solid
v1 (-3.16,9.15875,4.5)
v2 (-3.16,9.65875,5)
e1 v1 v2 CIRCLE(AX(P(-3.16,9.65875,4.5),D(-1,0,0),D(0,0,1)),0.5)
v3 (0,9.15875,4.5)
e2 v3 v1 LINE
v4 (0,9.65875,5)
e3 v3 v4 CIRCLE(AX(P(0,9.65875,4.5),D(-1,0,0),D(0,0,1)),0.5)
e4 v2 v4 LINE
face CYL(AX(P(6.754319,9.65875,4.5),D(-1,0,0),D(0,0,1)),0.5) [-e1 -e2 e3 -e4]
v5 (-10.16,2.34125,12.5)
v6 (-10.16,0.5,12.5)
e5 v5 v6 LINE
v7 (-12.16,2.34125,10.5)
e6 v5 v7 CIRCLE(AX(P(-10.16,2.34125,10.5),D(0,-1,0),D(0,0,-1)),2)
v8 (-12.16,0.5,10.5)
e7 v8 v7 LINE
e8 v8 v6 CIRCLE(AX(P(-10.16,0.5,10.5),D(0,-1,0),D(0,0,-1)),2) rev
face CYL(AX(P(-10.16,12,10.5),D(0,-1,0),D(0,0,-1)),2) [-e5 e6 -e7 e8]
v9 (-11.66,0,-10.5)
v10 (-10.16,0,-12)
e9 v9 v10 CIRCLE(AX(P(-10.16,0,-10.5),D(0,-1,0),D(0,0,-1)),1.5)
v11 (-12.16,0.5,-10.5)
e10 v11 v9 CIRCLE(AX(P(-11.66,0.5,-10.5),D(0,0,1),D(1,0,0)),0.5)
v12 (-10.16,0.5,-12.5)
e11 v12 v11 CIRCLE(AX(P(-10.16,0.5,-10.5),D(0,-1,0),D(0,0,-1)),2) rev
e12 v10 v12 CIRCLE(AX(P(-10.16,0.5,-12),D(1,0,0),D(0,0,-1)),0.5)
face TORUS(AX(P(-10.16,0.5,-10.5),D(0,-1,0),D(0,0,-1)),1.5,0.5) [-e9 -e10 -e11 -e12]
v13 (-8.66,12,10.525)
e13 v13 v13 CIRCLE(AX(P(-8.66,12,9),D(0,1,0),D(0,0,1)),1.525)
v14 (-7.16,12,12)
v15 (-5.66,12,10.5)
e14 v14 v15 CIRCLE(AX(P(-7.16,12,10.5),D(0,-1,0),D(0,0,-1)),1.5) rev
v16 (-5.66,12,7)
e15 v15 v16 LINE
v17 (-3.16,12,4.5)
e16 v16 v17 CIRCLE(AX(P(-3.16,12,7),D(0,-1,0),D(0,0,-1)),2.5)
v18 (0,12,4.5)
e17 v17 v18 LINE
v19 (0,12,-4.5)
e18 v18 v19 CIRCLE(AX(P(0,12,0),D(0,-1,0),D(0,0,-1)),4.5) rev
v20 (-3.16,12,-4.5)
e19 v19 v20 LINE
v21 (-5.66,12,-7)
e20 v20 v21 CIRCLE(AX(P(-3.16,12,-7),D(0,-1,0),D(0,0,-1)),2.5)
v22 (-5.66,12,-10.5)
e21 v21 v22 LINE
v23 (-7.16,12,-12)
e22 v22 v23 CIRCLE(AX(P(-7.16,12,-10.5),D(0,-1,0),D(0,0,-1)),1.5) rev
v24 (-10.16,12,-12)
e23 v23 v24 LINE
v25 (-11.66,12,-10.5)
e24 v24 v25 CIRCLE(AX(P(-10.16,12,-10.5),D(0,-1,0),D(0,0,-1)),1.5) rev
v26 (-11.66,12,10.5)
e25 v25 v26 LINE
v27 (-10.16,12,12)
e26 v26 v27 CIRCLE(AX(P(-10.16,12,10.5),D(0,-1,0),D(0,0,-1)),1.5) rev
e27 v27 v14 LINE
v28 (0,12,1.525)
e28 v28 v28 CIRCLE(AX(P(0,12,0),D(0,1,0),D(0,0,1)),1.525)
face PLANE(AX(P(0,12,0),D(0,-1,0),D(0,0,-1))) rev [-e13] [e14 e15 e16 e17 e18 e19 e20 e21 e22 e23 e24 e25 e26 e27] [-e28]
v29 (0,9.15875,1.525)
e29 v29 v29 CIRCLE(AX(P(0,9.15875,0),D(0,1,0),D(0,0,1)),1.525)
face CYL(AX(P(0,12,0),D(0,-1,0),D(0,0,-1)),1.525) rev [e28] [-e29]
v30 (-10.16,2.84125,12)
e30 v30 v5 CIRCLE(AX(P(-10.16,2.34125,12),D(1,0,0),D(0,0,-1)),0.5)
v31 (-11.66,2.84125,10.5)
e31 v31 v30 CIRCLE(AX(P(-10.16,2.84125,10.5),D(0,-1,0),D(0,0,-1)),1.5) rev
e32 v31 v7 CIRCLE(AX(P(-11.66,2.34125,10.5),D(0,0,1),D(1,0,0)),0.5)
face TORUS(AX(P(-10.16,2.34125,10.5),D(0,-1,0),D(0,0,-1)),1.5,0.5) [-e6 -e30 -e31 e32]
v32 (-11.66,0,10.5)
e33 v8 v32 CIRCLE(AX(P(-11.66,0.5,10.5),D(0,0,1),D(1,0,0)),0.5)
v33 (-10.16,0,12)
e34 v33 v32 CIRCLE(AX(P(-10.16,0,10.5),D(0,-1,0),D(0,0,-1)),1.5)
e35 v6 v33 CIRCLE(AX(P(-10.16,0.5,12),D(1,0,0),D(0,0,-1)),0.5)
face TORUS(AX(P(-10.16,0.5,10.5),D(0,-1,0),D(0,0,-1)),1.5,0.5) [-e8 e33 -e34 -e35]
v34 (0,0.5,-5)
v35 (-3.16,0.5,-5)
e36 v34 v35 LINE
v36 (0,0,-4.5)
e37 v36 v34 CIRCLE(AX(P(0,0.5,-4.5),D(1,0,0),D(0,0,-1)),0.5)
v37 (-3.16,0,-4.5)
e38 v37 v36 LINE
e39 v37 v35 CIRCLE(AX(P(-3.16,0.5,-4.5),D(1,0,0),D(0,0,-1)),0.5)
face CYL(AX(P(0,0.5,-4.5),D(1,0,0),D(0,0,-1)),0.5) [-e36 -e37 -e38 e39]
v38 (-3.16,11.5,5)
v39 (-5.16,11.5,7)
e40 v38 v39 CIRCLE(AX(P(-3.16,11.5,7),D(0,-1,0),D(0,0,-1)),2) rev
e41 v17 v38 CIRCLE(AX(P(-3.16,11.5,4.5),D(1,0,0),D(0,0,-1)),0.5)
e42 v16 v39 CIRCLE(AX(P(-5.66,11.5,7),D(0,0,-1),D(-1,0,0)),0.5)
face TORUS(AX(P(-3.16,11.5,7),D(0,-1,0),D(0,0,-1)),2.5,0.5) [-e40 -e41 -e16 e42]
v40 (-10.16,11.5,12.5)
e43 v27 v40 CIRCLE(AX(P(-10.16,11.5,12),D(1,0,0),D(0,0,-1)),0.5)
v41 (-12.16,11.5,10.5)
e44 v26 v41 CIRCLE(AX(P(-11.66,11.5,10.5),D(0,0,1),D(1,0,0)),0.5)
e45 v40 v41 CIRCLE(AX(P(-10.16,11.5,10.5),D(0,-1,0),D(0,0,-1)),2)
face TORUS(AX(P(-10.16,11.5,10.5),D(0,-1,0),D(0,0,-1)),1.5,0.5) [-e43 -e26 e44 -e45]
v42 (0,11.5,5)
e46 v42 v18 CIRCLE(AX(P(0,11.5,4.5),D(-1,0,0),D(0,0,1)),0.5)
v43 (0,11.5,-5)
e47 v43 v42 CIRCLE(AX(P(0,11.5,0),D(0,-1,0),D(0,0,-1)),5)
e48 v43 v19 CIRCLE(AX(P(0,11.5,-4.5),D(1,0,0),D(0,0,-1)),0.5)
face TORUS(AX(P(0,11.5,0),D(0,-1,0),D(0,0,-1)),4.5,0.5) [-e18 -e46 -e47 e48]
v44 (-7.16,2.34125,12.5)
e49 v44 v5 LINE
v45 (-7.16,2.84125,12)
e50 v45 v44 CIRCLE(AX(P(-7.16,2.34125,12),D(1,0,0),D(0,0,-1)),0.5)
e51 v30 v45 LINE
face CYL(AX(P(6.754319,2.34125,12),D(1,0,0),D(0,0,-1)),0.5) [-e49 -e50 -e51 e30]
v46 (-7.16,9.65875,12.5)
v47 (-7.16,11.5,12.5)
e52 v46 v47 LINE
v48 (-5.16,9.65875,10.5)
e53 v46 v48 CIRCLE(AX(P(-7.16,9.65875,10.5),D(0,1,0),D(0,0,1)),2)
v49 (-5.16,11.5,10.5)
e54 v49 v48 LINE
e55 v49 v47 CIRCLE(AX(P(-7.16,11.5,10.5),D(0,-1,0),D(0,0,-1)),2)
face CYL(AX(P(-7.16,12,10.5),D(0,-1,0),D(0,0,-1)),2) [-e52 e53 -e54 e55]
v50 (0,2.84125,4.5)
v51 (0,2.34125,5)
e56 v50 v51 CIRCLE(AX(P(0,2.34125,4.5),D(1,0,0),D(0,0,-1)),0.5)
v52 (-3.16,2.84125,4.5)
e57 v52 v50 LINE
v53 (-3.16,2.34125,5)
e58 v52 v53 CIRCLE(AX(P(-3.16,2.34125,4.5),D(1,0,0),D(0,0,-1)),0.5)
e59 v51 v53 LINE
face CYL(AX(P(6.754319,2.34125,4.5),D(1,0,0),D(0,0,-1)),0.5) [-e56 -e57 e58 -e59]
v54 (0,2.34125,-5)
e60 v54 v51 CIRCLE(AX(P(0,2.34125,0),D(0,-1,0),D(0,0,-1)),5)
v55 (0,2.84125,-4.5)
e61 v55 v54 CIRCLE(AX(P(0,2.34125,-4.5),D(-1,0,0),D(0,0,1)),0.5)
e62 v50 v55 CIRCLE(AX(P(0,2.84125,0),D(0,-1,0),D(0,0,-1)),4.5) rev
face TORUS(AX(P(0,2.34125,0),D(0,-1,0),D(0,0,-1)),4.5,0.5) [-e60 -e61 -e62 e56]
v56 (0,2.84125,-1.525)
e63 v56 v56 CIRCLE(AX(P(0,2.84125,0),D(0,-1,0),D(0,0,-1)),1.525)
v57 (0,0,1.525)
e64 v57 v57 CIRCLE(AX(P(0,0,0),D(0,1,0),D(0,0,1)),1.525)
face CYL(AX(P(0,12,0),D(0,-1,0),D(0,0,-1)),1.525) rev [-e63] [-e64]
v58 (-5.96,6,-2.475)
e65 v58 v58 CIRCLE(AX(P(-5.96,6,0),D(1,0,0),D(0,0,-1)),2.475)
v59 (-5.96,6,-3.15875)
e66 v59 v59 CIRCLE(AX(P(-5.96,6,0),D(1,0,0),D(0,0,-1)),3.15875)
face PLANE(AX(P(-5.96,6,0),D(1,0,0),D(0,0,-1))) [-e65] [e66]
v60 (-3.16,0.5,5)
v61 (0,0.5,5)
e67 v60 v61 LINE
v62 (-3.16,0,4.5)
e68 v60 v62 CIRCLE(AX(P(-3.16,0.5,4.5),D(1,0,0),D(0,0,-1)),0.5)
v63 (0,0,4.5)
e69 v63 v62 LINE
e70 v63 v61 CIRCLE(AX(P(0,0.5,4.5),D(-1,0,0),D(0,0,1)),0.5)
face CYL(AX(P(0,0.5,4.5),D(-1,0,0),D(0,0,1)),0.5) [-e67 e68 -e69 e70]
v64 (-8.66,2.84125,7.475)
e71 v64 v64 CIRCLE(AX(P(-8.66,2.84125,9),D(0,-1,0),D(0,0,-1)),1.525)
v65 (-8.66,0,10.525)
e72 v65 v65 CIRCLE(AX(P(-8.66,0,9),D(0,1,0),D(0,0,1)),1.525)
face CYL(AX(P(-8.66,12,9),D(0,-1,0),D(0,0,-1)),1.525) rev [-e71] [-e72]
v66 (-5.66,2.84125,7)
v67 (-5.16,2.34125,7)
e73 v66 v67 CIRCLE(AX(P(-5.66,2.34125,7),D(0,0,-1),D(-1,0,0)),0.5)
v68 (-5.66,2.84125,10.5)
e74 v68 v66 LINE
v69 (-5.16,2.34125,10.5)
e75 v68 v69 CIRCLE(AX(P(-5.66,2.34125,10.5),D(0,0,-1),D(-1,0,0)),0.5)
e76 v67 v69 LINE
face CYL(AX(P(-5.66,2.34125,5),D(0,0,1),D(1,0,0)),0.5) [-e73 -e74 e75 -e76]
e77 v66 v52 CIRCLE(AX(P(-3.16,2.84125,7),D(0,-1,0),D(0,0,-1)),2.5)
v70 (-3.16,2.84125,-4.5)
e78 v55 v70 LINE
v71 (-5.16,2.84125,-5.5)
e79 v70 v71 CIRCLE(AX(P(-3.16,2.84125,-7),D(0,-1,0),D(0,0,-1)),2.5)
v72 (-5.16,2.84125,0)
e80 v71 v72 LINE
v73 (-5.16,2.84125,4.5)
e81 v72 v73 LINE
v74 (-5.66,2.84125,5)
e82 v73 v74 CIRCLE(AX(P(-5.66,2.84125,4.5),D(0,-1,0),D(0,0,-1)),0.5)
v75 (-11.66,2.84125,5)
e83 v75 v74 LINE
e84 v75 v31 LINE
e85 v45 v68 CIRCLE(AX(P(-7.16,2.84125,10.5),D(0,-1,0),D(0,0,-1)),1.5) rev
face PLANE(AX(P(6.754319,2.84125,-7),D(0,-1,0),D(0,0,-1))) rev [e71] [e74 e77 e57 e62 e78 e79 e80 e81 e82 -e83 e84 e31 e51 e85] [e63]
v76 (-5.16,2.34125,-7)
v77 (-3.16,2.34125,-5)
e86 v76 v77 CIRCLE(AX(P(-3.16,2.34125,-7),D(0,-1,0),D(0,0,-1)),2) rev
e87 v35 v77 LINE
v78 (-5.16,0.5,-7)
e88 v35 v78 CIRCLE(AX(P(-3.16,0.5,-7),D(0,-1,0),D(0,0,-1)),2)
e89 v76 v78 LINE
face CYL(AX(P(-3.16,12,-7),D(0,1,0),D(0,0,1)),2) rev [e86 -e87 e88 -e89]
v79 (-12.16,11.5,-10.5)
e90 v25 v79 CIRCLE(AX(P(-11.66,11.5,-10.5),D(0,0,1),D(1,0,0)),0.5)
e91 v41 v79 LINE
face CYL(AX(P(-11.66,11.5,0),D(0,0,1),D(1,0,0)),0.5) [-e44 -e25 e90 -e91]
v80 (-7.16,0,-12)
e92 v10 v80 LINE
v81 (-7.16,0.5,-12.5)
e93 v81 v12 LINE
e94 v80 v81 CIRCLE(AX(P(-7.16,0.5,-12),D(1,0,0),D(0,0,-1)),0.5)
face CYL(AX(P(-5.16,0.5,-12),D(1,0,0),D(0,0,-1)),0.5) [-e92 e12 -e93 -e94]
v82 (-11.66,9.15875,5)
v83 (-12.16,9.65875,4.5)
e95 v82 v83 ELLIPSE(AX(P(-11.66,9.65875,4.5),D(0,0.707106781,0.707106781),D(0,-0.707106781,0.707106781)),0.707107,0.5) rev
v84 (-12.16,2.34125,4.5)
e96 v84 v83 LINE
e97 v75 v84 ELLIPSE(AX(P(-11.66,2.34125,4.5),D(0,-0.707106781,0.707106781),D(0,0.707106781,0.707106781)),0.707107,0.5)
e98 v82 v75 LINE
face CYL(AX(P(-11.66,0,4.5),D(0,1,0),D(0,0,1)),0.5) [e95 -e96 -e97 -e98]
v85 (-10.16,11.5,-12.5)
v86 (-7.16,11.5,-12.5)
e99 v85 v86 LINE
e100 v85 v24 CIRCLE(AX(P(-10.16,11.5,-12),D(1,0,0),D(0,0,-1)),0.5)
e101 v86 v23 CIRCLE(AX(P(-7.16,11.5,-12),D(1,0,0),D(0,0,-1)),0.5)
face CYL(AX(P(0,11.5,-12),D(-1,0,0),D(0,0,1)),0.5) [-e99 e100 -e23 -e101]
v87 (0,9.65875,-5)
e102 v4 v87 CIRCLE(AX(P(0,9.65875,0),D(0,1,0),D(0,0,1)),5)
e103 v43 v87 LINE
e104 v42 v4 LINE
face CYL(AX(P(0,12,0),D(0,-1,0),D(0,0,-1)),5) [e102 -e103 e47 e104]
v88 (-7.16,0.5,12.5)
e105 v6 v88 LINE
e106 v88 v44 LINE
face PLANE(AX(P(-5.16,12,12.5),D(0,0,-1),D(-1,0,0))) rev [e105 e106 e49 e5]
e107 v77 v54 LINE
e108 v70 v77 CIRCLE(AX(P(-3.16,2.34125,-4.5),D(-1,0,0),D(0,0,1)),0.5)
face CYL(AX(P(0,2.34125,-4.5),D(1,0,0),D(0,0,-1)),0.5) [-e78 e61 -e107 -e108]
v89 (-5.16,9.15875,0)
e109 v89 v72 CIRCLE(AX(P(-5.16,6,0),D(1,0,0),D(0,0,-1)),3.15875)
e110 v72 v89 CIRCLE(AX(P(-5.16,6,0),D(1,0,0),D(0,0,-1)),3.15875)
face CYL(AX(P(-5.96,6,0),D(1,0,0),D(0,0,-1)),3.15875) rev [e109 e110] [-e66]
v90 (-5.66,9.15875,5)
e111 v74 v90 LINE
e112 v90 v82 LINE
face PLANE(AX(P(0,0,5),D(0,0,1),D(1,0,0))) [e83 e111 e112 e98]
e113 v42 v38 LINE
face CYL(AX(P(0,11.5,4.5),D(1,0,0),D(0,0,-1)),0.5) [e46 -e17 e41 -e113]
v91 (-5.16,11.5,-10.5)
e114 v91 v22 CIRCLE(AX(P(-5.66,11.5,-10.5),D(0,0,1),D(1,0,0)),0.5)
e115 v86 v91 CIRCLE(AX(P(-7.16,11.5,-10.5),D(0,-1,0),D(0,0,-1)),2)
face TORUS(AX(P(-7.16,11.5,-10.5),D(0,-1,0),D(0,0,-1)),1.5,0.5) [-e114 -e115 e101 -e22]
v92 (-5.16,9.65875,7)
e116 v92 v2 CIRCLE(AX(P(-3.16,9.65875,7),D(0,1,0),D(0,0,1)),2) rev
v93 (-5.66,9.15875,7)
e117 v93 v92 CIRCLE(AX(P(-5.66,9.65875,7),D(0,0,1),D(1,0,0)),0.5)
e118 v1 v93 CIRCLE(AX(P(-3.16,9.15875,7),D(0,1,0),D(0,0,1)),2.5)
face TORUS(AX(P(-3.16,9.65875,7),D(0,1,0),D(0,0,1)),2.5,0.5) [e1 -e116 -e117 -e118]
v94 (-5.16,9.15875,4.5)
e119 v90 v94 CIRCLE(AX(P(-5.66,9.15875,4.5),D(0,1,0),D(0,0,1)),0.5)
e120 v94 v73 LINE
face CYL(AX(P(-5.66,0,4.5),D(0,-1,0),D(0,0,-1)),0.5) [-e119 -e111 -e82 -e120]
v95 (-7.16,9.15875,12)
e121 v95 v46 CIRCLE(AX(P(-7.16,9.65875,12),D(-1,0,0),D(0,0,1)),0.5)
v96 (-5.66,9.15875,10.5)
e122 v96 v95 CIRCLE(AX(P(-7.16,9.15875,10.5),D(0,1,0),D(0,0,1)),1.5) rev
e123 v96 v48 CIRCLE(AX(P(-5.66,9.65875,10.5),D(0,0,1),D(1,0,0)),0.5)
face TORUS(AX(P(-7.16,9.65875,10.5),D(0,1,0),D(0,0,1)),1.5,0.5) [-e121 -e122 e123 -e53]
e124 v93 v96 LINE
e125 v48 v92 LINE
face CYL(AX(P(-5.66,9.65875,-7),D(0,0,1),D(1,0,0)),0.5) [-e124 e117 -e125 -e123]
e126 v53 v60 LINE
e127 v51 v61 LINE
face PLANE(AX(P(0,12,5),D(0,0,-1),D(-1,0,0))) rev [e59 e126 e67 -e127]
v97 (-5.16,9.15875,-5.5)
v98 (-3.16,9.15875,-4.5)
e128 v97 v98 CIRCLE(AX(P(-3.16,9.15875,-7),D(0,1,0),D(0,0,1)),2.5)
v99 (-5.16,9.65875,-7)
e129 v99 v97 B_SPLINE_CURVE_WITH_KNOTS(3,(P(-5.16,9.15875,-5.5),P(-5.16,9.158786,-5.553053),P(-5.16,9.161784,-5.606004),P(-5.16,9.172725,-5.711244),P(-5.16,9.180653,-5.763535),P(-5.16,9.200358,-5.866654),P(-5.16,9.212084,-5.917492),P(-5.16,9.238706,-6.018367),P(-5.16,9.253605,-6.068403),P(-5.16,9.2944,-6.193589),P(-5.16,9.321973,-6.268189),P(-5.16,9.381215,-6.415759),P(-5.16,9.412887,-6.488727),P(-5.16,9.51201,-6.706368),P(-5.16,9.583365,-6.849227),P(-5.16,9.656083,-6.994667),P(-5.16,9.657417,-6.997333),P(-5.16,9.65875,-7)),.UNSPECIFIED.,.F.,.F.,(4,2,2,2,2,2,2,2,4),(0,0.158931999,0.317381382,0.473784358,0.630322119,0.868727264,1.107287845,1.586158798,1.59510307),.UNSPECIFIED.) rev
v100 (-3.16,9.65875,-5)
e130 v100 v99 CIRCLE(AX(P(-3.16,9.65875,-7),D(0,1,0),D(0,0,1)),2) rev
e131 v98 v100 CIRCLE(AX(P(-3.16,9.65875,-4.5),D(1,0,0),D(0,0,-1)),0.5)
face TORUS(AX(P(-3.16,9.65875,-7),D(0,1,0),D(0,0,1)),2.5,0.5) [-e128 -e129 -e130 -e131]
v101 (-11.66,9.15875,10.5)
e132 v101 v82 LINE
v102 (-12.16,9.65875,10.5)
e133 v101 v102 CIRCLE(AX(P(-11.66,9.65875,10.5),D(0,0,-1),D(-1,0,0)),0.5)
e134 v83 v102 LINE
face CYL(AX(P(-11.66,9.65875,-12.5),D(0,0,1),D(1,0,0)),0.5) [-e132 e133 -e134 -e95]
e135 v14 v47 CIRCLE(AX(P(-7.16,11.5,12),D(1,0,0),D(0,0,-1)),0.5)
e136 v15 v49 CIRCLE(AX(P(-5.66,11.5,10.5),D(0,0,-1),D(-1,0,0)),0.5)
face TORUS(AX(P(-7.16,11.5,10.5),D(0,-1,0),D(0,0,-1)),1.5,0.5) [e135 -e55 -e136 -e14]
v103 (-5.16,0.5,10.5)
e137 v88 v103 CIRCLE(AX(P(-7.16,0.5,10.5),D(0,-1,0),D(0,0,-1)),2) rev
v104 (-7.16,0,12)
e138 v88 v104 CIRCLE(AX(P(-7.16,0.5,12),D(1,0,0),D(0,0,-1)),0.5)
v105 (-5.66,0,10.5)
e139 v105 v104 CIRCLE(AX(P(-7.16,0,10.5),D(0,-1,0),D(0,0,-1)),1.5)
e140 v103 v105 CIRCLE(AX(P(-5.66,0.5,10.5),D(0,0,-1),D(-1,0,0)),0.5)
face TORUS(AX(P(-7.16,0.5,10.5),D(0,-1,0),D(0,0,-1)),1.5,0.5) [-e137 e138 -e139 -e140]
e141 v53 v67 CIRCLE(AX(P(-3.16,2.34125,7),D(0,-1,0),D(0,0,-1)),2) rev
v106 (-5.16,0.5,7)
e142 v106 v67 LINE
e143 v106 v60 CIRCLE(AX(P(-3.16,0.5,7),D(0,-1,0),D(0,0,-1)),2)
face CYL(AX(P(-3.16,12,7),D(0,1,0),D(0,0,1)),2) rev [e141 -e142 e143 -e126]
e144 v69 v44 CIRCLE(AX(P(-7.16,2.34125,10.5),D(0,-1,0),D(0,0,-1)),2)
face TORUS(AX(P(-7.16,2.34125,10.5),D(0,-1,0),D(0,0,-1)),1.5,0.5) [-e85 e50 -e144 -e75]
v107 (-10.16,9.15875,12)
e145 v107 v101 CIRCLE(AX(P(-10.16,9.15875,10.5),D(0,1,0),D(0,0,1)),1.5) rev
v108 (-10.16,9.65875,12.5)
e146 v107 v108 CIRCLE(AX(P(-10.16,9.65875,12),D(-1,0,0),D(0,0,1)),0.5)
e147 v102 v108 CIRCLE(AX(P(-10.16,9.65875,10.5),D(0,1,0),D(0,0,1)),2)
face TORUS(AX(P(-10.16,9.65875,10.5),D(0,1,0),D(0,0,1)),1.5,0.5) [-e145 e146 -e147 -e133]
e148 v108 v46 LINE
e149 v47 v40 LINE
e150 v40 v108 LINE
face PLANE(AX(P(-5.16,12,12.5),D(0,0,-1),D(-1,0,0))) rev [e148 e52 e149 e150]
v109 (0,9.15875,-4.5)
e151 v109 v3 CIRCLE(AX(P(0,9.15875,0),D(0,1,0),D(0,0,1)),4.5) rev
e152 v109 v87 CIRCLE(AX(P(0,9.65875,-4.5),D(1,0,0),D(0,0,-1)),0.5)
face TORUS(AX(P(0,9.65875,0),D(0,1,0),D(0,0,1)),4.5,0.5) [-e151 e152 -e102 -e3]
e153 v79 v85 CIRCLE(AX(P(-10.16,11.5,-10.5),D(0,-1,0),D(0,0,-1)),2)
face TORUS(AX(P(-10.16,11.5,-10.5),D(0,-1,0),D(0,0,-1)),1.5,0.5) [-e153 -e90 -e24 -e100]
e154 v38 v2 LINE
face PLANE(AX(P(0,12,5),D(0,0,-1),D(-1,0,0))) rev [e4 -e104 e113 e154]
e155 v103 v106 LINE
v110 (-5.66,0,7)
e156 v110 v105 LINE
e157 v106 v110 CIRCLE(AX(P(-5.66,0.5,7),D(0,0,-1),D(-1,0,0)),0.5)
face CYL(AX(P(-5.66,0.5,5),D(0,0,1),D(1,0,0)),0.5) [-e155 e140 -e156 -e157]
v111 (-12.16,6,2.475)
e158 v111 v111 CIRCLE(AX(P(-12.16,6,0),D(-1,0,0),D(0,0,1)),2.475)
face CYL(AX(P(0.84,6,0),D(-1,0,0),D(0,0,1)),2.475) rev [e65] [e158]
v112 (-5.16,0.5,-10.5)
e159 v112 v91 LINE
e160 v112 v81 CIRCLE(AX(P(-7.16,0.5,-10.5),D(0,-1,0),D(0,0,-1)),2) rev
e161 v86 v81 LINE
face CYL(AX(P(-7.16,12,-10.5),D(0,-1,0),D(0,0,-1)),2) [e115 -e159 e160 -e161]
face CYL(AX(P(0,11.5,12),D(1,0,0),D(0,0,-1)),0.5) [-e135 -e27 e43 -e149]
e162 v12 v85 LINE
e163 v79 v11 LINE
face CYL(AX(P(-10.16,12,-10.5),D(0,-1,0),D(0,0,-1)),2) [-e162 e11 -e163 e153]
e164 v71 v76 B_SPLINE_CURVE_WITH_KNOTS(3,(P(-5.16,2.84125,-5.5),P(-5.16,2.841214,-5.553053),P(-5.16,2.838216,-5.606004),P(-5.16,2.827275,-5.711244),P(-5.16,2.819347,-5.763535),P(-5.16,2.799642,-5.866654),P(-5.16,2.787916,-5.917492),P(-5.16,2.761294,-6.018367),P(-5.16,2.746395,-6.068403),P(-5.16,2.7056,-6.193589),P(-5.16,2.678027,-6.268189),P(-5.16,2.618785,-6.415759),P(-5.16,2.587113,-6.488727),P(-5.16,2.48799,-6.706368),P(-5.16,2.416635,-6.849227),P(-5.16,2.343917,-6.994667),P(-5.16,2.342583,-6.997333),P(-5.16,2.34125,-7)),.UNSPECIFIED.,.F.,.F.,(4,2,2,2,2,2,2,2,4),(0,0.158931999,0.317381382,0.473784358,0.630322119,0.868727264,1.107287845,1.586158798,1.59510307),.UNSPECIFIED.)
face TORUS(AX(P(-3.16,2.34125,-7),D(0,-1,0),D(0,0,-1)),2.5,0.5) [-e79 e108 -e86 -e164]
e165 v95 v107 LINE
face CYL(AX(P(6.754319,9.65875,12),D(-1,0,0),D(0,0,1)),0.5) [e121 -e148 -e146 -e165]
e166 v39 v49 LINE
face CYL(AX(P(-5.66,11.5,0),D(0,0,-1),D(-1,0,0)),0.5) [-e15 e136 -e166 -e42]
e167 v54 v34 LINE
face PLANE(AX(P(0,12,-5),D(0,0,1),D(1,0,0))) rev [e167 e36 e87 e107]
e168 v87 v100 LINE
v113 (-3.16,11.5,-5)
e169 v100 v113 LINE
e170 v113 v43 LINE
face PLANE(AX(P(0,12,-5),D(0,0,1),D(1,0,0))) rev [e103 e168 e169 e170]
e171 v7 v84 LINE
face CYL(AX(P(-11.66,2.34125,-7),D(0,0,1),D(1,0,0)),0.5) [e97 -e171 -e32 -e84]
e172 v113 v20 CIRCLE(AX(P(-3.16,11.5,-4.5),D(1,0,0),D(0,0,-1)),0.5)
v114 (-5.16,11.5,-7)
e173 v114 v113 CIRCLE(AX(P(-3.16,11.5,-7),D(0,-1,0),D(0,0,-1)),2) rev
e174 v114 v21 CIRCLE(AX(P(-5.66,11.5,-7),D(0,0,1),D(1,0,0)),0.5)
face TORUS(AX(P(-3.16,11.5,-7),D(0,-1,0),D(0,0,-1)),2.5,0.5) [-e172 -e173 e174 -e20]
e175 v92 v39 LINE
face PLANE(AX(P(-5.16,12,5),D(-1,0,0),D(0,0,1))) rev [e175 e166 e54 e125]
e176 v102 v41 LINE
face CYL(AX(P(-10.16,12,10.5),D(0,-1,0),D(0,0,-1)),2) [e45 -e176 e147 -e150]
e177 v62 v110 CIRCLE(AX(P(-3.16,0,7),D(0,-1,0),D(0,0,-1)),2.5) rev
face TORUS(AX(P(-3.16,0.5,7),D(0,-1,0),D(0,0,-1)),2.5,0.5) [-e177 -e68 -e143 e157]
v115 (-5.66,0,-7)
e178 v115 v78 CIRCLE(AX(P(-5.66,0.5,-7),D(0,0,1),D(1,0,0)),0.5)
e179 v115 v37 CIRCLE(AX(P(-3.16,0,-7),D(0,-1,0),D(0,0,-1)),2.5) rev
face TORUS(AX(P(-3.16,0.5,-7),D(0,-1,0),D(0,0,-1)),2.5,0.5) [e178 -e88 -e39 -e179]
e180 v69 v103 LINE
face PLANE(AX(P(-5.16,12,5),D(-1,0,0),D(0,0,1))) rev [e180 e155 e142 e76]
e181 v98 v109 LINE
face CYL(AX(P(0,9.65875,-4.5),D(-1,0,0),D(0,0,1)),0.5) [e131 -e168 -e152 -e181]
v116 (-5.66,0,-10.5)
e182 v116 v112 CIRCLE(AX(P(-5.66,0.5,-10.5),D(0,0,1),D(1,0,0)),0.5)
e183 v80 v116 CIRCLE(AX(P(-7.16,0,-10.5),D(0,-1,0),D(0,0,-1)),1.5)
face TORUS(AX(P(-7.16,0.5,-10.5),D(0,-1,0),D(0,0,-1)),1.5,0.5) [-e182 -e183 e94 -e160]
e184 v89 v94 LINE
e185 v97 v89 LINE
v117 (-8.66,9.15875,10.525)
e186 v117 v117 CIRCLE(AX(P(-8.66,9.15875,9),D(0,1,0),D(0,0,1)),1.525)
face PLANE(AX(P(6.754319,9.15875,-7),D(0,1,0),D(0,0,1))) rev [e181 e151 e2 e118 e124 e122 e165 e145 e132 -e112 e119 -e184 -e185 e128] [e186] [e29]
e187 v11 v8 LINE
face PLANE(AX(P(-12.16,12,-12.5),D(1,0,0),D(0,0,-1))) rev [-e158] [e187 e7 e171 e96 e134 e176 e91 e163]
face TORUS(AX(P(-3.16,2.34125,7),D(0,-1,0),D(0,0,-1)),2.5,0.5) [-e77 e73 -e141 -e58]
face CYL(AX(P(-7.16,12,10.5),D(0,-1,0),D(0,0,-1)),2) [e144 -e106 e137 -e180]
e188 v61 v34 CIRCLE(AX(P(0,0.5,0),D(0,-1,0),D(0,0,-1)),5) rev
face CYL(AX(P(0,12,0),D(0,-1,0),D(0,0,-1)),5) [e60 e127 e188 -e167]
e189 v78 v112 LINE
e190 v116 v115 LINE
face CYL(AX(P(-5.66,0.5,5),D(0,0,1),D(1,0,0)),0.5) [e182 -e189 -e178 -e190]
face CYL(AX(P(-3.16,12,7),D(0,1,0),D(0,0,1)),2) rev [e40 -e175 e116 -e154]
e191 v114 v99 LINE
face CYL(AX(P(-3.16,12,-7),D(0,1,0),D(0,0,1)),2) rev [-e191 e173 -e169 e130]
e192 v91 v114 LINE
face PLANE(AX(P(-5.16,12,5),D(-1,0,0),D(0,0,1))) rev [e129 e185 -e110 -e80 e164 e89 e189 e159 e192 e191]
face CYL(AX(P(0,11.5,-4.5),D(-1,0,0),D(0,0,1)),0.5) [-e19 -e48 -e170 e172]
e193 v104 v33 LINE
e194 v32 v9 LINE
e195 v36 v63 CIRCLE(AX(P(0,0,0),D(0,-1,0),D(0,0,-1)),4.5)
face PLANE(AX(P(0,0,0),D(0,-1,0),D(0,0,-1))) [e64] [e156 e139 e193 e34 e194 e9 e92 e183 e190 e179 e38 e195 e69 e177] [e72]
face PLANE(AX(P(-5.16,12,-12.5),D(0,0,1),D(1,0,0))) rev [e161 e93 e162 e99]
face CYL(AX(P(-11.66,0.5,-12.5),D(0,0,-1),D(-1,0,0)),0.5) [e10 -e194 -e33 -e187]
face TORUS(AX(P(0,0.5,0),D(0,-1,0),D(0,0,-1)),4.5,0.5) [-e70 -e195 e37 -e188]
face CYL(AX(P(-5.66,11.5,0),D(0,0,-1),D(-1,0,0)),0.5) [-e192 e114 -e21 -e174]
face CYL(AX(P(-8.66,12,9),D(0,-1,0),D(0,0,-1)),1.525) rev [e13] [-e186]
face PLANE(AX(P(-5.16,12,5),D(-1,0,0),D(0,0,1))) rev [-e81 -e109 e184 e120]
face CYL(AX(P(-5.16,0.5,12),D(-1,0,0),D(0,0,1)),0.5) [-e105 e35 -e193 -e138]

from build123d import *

# Parameters (mm, degrees)
SKETCH2_R           = 1.525
BOSS_EXTRUDE1_DEPTH = 12
SKETCH3_W           = 11.91431853
SKETCH3_H           = 6.3175
CUT_EXTRUDE1_DEPTH  = 12
FILLET2_R           = 2
SKETCH5_R           = 2.475
CUT_EXTRUDE3_DEPTH  = 13
SKETCH6_W           = 7
SKETCH6_H           = 6.3175
CUT_EXTRUDE4_DEPTH  = 7.5
FILLET3_R           = 2
CUT_EXTRUDE5_START  = -0.8
SKETCH8_R           = 3.15875
SKETCH8_R_2         = 2.475
CUT_EXTRUDE5_DEPTH  = 0.8
FILLET8_R           = 0.5


with BuildPart() as part:
    # Sketch2 → Boss-Extrude1 (new body)
    with BuildSketch(Plane(origin=(0, 0, 0), x_dir=(1, 0, 0), z_dir=(0, 1, 0))):
        with BuildLine():
            Line((-5.16, -5), (-5.16, -12.5))
            Line((-5.16, -12.5), (-12.16, -12.5))
            Line((-12.16, -12.5), (-12.16, 12.5))
            Line((-12.16, 12.5), (-5.16, 12.5))
            Line((-5.16, 12.5), (-5.16, 5))
            Line((-5.16, 5), (0, 5))
            ThreePointArc((0, 5), (5, 0), (0, -5))
            Line((0, -5), (-5.16, -5))
        make_face()
        with Locations(Location((0, 0, 0), (0, 0, 270))):
            Circle(SKETCH2_R, mode=Mode.SUBTRACT)
        with Locations(Location((-8.66, -9, 0), (0, 0, 270))):
            Circle(SKETCH2_R, mode=Mode.SUBTRACT)
    extrude(amount=BOSS_EXTRUDE1_DEPTH)

    # Sketch3 → Cut-Extrude1 (cut)
    with BuildSketch(Plane.XY.offset(5)):
        with Locations((0.797159265, 6)):
            Rectangle(SKETCH3_W, SKETCH3_H)
    extrude(amount=-CUT_EXTRUDE1_DEPTH, mode=Mode.SUBTRACT)

    # Fillet2
    fillet2_edges = [part.edges().sort_by_distance(p)[0] for p in [
        (-5.16, 10.579375, 5),
        (-5.16, 10.579375, -5),
        (-5.16, 1.420625, 5),
        (-5.16, 1.420625, -5),
    ]]
    fillet(fillet2_edges, radius=FILLET2_R)

    # Sketch5 → Cut-Extrude3 (cut)
    with BuildSketch(Plane.ZY.offset(12.16)):
        with Locations((0, 6)):
            Circle(SKETCH5_R)
    extrude(amount=-CUT_EXTRUDE3_DEPTH, mode=Mode.SUBTRACT)

    # Sketch6 → Cut-Extrude4 (cut)
    with BuildSketch(Plane.XY.offset(12.5)):
        with Locations((-8.66, 6)):
            Rectangle(SKETCH6_W, SKETCH6_H)
    extrude(amount=-CUT_EXTRUDE4_DEPTH, mode=Mode.SUBTRACT)

    # Fillet3
    fillet3_edges = [part.edges().sort_by_distance(p)[0] for p in [
        (-5.16, 1.420625, 12.5),
        (-12.16, 1.420625, 12.5),
        (-5.16, 10.579375, 12.5),
        (-12.16, 10.579375, 12.5),
        (-12.16, 6, -12.5),
        (-5.16, 6, -12.5),
    ]]
    fillet(fillet3_edges, radius=FILLET3_R)

    # Sketch8 → Cut-Extrude5 (cut)
    with BuildSketch(Plane(origin=(-5.16, 0, 0), x_dir=(0, 0, -1), z_dir=(1, 0, 0)).offset(CUT_EXTRUDE5_START)):
        with Locations((0, 6)):
            Circle(SKETCH8_R)
        with Locations(Location((0, 6, 0), (0, 0, 180))):
            Circle(SKETCH8_R_2, mode=Mode.SUBTRACT)
    extrude(amount=CUT_EXTRUDE5_DEPTH, mode=Mode.SUBTRACT)

    # Fillet8
    # the kernel refuses this fillet: 0.5 mm, written as the material it takes off along each edge
    with BuildSketch(Plane(origin=(-3.16, 0, -5), x_dir=(0, 0, 1), z_dir=(1, 0, 0)), Plane(origin=(-3.16, 2.84125, -5), x_dir=(0, -1, 0), z_dir=(1, 0, 0)), Plane(origin=(0, 2.84125, 5), x_dir=(0, -1, 0), z_dir=(-1, 0, 0)), Plane(origin=(0, 0, 5), x_dir=(0, 0, -1), z_dir=(-1, 0, 0))) as fillet8_piece_1:
        with BuildLine():
            CenterArc((FILLET8_R, -FILLET8_R), FILLET8_R, 90, 90)
            Line((0, -FILLET8_R), (0, 0))
            Line((0, 0), (FILLET8_R, 0))
        make_face()
    extrude(amount=3.16, mode=Mode.SUBTRACT)
    with BuildSketch(Plane(origin=(0, 0, 0), x_dir=(0, 0, -1), z_dir=(-1, 0, 0))) as fillet8_piece_2:
        with BuildLine():
            CenterArc((5 - FILLET8_R, -FILLET8_R), FILLET8_R, 0, 90)
            Line((5, -FILLET8_R), (5, 0))
            Line((5, 0), (5 - FILLET8_R, 0))
        make_face()
    revolve(axis=Axis((0, 0, 0), (0, -1, 0)), revolution_arc=180, mode=Mode.SUBTRACT)
    with BuildSketch(Plane(origin=(-12.16, 2.84125, 5), x_dir=(0, 0, -1), z_dir=(0, 1, 0))) as fillet8_piece_3:
        with BuildLine():
            CenterArc((FILLET8_R, -FILLET8_R), FILLET8_R, 90, 90)
            Line((0, -FILLET8_R), (0, 0))
            Line((0, 0), (FILLET8_R, 0))
        make_face()
    extrude(amount=6.3175, mode=Mode.SUBTRACT)
    with BuildSketch(Plane(origin=(-12.16, 2.84125, 10.5), x_dir=(0, -1, 0), z_dir=(0, 0, -1))) as fillet8_piece_4:
        with BuildLine():
            CenterArc((FILLET8_R, -FILLET8_R), FILLET8_R, 90, 90)
            Line((0, -FILLET8_R), (0, 0))
            Line((0, 0), (FILLET8_R, 0))
        make_face()
    extrude(amount=5.5, mode=Mode.SUBTRACT)
    with BuildSketch(Plane(origin=(-12.16, 9.15875, 10.5), x_dir=(0, 1, 0), z_dir=(0, 0, -1))) as fillet8_piece_5:
        with BuildLine():
            CenterArc((FILLET8_R, FILLET8_R), FILLET8_R, 180, 90)
            Line((0, FILLET8_R), (0, 0))
            Line((0, 0), (FILLET8_R, 0))
        make_face()
    extrude(amount=5.5, mode=Mode.SUBTRACT)
    with BuildSketch(Plane(origin=(-5.16, 9.15875, 5), x_dir=(-1, 0, 0), z_dir=(0, -1, 0))) as fillet8_piece_6:
        with BuildLine():
            CenterArc((FILLET8_R, FILLET8_R), FILLET8_R, 180, 90)
            Line((0, FILLET8_R), (0, 0))
            Line((0, 0), (FILLET8_R, 0))
        make_face()
    extrude(amount=6.3175, mode=Mode.SUBTRACT)
    with BuildSketch(Plane(origin=(-5.16, 9.15875, 10.5), x_dir=(-1, 0, 0), z_dir=(0, 0, -1)), Plane(origin=(-5.16, 2.84125, 10.5), x_dir=(0, -1, 0), z_dir=(0, 0, -1)), Plane(origin=(-5.16, 12, 7), x_dir=(-1, 0, 0), z_dir=(0, 0, 1))) as fillet8_piece_7:
        with BuildLine():
            CenterArc((FILLET8_R, FILLET8_R), FILLET8_R, 180, 90)
            Line((0, FILLET8_R), (0, 0))
            Line((0, 0), (FILLET8_R, 0))
        make_face()
    extrude(amount=3.5, mode=Mode.SUBTRACT)
    with BuildSketch(Plane(origin=(-12.16, 12, 10.5), x_dir=(0, -1, 0), z_dir=(0, 0, -1)), Plane(origin=(-12.16, 0, 10.5), x_dir=(1, 0, 0), z_dir=(0, 0, -1))) as fillet8_piece_8:
        with BuildLine():
            CenterArc((FILLET8_R, -FILLET8_R), FILLET8_R, 90, 90)
            Line((0, -FILLET8_R), (0, 0))
            Line((0, 0), (FILLET8_R, 0))
        make_face()
    extrude(amount=21, mode=Mode.SUBTRACT)
    with BuildSketch(Plane(origin=(-5.16, 0, 7), x_dir=(-1, 0, 0), z_dir=(0, 0, 1)), Plane(origin=(-5.16, 0, -10.5), x_dir=(-1, 0, 0), z_dir=(0, 0, 1)), Plane(origin=(-5.16, 12, -10.5), x_dir=(0, -1, 0), z_dir=(0, 0, 1))) as fillet8_piece_9:
        with BuildLine():
            CenterArc((FILLET8_R, -FILLET8_R), FILLET8_R, 90, 90)
            Line((0, -FILLET8_R), (0, 0))
            Line((0, 0), (FILLET8_R, 0))
        make_face()
    extrude(amount=3.5, mode=Mode.SUBTRACT)
    with BuildSketch(Plane(origin=(-7.16, 0, 12.5), x_dir=(0, 0, -1), z_dir=(-1, 0, 0)), Plane(origin=(-10.16, 0, -12.5), x_dir=(0, 0, 1), z_dir=(1, 0, 0)), Plane(origin=(-10.16, 12, -12.5), x_dir=(0, -1, 0), z_dir=(1, 0, 0)), Plane(origin=(-7.16, 2.84125, 12.5), x_dir=(0, -1, 0), z_dir=(-1, 0, 0))) as fillet8_piece_10:
        with BuildLine():
            CenterArc((FILLET8_R, -FILLET8_R), FILLET8_R, 90, 90)
            Line((0, -FILLET8_R), (0, 0))
            Line((0, 0), (FILLET8_R, 0))
        make_face()
    extrude(amount=3, mode=Mode.SUBTRACT)
    with BuildSketch(Plane(origin=(-10.16, 0, 10.5), x_dir=(0, 0, 1), z_dir=(1, 0, 0))) as fillet8_piece_11:
        with BuildLine():
            CenterArc((2 - FILLET8_R, -FILLET8_R), FILLET8_R, 0, 90)
            Line((2, -FILLET8_R), (2, 0))
            Line((2, 0), (2 - FILLET8_R, 0))
        make_face()
    revolve(axis=Axis((-10.16, 0, 10.5), (0, -1, 0)), revolution_arc=90, mode=Mode.SUBTRACT)
    with BuildSketch(Plane(origin=(-7.16, 0, 10.5), x_dir=(1, 0, 0), z_dir=(0, 0, -1))) as fillet8_piece_12:
        with BuildLine():
            CenterArc((2 - FILLET8_R, -FILLET8_R), FILLET8_R, 0, 90)
            Line((2, -FILLET8_R), (2, 0))
            Line((2, 0), (2 - FILLET8_R, 0))
        make_face()
    revolve(axis=Axis((-7.16, 0, 10.5), (0, -1, 0)), revolution_arc=90, mode=Mode.SUBTRACT)
    with BuildSketch(Plane(origin=(-7.16, 0, -10.5), x_dir=(1, 0, 0), z_dir=(0, 0, 1))) as fillet8_piece_13:
        with BuildLine():
            CenterArc((2 - FILLET8_R, FILLET8_R), FILLET8_R, 270, 90)
            Line((2, FILLET8_R), (2, 0))
            Line((2, 0), (2 - FILLET8_R, 0))
        make_face()
    revolve(axis=Axis((-7.16, 0, -10.5), (0, 1, 0)), revolution_arc=90, mode=Mode.SUBTRACT)
    with BuildSketch(Plane(origin=(-10.16, 0, -10.5), x_dir=(-1, 0, 0), z_dir=(0, 0, 1))) as fillet8_piece_14:
        with BuildLine():
            CenterArc((2 - FILLET8_R, -FILLET8_R), FILLET8_R, 0, 90)
            Line((2, -FILLET8_R), (2, 0))
            Line((2, 0), (2 - FILLET8_R, 0))
        make_face()
    revolve(axis=Axis((-10.16, 0, -10.5), (0, -1, 0)), revolution_arc=90, mode=Mode.SUBTRACT)
    with BuildSketch(Plane(origin=(-7.16, 12, 12.5), x_dir=(0, 0, -1), z_dir=(-1, 0, 0)), Plane(origin=(-10.16, 9.15875, 12.5), x_dir=(0, 0, -1), z_dir=(1, 0, 0))) as fillet8_piece_15:
        with BuildLine():
            CenterArc((FILLET8_R, FILLET8_R), FILLET8_R, 180, 90)
            Line((0, FILLET8_R), (0, 0))
            Line((0, 0), (FILLET8_R, 0))
        make_face()
    extrude(amount=3, mode=Mode.SUBTRACT)
    with BuildSketch(Plane(origin=(-7.16, 12, 10.5), x_dir=(0, 0, 1), z_dir=(-1, 0, 0))) as fillet8_piece_16:
        with BuildLine():
            CenterArc((2 - FILLET8_R, -FILLET8_R), FILLET8_R, 0, 90)
            Line((2, -FILLET8_R), (2, 0))
            Line((2, 0), (2 - FILLET8_R, 0))
        make_face()
    revolve(axis=Axis((-7.16, 12, 10.5), (0, 1, 0)), revolution_arc=90, mode=Mode.SUBTRACT)
    with BuildSketch(Plane(origin=(-10.16, 12, 10.5), x_dir=(-1, 0, 0), z_dir=(0, 0, -1))) as fillet8_piece_17:
        with BuildLine():
            CenterArc((2 - FILLET8_R, -FILLET8_R), FILLET8_R, 0, 90)
            Line((2, -FILLET8_R), (2, 0))
            Line((2, 0), (2 - FILLET8_R, 0))
        make_face()
    revolve(axis=Axis((-10.16, 12, 10.5), (0, 1, 0)), revolution_arc=90, mode=Mode.SUBTRACT)
    with BuildSketch(Plane(origin=(-7.16, 12, -10.5), x_dir=(1, 0, 0), z_dir=(0, 0, 1))) as fillet8_piece_18:
        with BuildLine():
            CenterArc((2 - FILLET8_R, -FILLET8_R), FILLET8_R, 0, 90)
            Line((2 - FILLET8_R, 0), (2, 0))
            Line((2, 0), (2, -FILLET8_R))
        make_face()
    revolve(axis=Axis((-7.16, 12, -10.5), (0, 1, 0)), revolution_arc=90, mode=Mode.SUBTRACT)
    with BuildSketch(Plane(origin=(-10.16, 12, -10.5), x_dir=(-1, 0, 0), z_dir=(0, 0, 1))) as fillet8_piece_19:
        with BuildLine():
            CenterArc((2 - FILLET8_R, FILLET8_R), FILLET8_R, 270, 90)
            Line((2 - FILLET8_R, 0), (2, 0))
            Line((2, 0), (2, FILLET8_R))
        make_face()
    revolve(axis=Axis((-10.16, 12, -10.5), (0, -1, 0)), revolution_arc=90, mode=Mode.SUBTRACT)
    with BuildSketch(Plane(origin=(-7.16, 9.15875, 10.5), x_dir=(0, 0, 1), z_dir=(-1, 0, 0))) as fillet8_piece_20:
        with BuildLine():
            CenterArc((2 - FILLET8_R, FILLET8_R), FILLET8_R, 270, 90)
            Line((2, FILLET8_R), (2, 0))
            Line((2, 0), (2 - FILLET8_R, 0))
        make_face()
    revolve(axis=Axis((-7.16, 9.15875, 10.5), (0, 1, 0)), revolution_arc=90, mode=Mode.SUBTRACT)
    with BuildSketch(Plane(origin=(-10.16, 9.15875, 10.5), x_dir=(-1, 0, 0), z_dir=(0, 0, -1))) as fillet8_piece_21:
        with BuildLine():
            CenterArc((2 - FILLET8_R, FILLET8_R), FILLET8_R, 270, 90)
            Line((2 - FILLET8_R, 0), (2, 0))
            Line((2, 0), (2, FILLET8_R))
        make_face()
    revolve(axis=Axis((-10.16, 9.15875, 10.5), (0, 1, 0)), revolution_arc=90, mode=Mode.SUBTRACT)
    with BuildSketch(Plane(origin=(-10.16, 2.84125, 10.5), x_dir=(0, 0, 1), z_dir=(1, 0, 0))) as fillet8_piece_22:
        with BuildLine():
            CenterArc((2 - FILLET8_R, FILLET8_R), FILLET8_R, 270, 90)
            Line((2 - FILLET8_R, 0), (2, 0))
            Line((2, 0), (2, FILLET8_R))
        make_face()
    revolve(axis=Axis((-10.16, 2.84125, 10.5), (0, -1, 0)), revolution_arc=90, mode=Mode.SUBTRACT)
    with BuildSketch(Plane(origin=(-7.16, 2.84125, 10.5), x_dir=(1, 0, 0), z_dir=(0, 0, -1))) as fillet8_piece_23:
        with BuildLine():
            CenterArc((2 - FILLET8_R, FILLET8_R), FILLET8_R, 270, 90)
            Line((2 - FILLET8_R, 0), (2, 0))
            Line((2, 0), (2, FILLET8_R))
        make_face()
    revolve(axis=Axis((-7.16, 2.84125, 10.5), (0, -1, 0)), revolution_arc=90, mode=Mode.SUBTRACT)
    with BuildSketch(Plane(origin=(0, 2.84125, 0), x_dir=(0, 0, -1), z_dir=(-1, 0, 0))) as fillet8_piece_24:
        with BuildLine():
            CenterArc((5 - FILLET8_R, FILLET8_R), FILLET8_R, 270, 90)
            Line((5 - FILLET8_R, 0), (5, 0))
            Line((5, 0), (5, FILLET8_R))
        make_face()
    revolve(axis=Axis((0, 2.84125, 0), (0, -1, 0)), revolution_arc=180, mode=Mode.SUBTRACT)
    with BuildSketch(Plane(origin=(0, 9.15875, 0), x_dir=(0, 0, -1), z_dir=(-1, 0, 0))) as fillet8_piece_25:
        with BuildLine():
            CenterArc((5 - FILLET8_R, -FILLET8_R), FILLET8_R, 0, 90)
            Line((5, -FILLET8_R), (5, 0))
            Line((5, 0), (5 - FILLET8_R, 0))
        make_face()
    revolve(axis=Axis((0, 9.15875, 0), (0, -1, 0)), revolution_arc=180, mode=Mode.SUBTRACT)
    with BuildSketch(Plane(origin=(0, 9.15875, -5), x_dir=(0, 0, 1), z_dir=(-1, 0, 0)), Plane(origin=(-3.16, 9.15875, 5), x_dir=(0, 0, -1), z_dir=(1, 0, 0)), Plane(origin=(0, 12, 5), x_dir=(0, 0, -1), z_dir=(-1, 0, 0)), Plane(origin=(-3.16, 12, -5), x_dir=(0, 0, 1), z_dir=(1, 0, 0))) as fillet8_piece_26:
        with BuildLine():
            CenterArc((FILLET8_R, FILLET8_R), FILLET8_R, 180, 90)
            Line((0, FILLET8_R), (0, 0))
            Line((0, 0), (FILLET8_R, 0))
        make_face()
    extrude(amount=3.16, mode=Mode.SUBTRACT)
    with BuildSketch(Plane(origin=(0, 12, 0), x_dir=(0, 0, -1), z_dir=(-1, 0, 0))) as fillet8_piece_27:
        with BuildLine():
            CenterArc((5 - FILLET8_R, FILLET8_R), FILLET8_R, 270, 90)
            Line((5, FILLET8_R), (5, 0))
            Line((5, 0), (5 - FILLET8_R, 0))
        make_face()
    revolve(axis=Axis((0, 12, 0), (0, -1, 0)), revolution_arc=180, mode=Mode.SUBTRACT)
    with BuildSketch(Plane(origin=(-3.16, 9.15875, -7), x_dir=(-0.48631676857152506, 0, -0.87378258199975), z_dir=(0.87378258199975, 0, -0.48631676857152506))) as fillet8_piece_28_section:
        with BuildLine():
            CenterArc((2 + FILLET8_R, FILLET8_R), FILLET8_R, 180, 90)
            Line((2, FILLET8_R), (2, 0))
            Line((2, 0), (2 + FILLET8_R, 0))
        make_face()
    fillet8_piece_28 = revolve(axis=Axis((-3.16, 9.15875, -7), (0, 1, 0)), revolution_arc=150.901220426, mode=Mode.PRIVATE)
    fillet8_piece_28 = split(fillet8_piece_28, bisect_by=Plane(origin=(-5.16, 9.15875, -7), z_dir=(1, 0, 0)), keep=Keep.TOP, mode=Mode.PRIVATE)
    add(fillet8_piece_28, mode=Mode.SUBTRACT)
    with BuildSketch(Plane(origin=(-3.16, 12, -7), x_dir=(-1, 0, 0), z_dir=(0, 0, -1))) as fillet8_piece_29:
        with BuildLine():
            CenterArc((2 + FILLET8_R, -FILLET8_R), FILLET8_R, 90, 90)
            Line((2, -FILLET8_R), (2, 0))
            Line((2, 0), (2 + FILLET8_R, 0))
        make_face()
    revolve(axis=Axis((-3.16, 12, -7), (0, 1, 0)), revolution_arc=90, mode=Mode.SUBTRACT)
    with BuildSketch(Plane(origin=(-3.16, 0, -7), x_dir=(-1, 0, 0), z_dir=(0, 0, -1))) as fillet8_piece_30:
        with BuildLine():
            CenterArc((2 + FILLET8_R, FILLET8_R), FILLET8_R, 180, 90)
            Line((2, FILLET8_R), (2, 0))
            Line((2, 0), (2 + FILLET8_R, 0))
        make_face()
    revolve(axis=Axis((-3.16, 0, -7), (0, 1, 0)), revolution_arc=90, mode=Mode.SUBTRACT)
    with BuildSketch(Plane(origin=(-3.16, 2.84125, -7), x_dir=(-0.48631676857152506, 0, -0.87378258199975), z_dir=(0.87378258199975, 0, -0.48631676857152506))) as fillet8_piece_31_section:
        with BuildLine():
            CenterArc((2 + FILLET8_R, -FILLET8_R), FILLET8_R, 90, 90)
            Line((2 + FILLET8_R, 0), (2, 0))
            Line((2, 0), (2, -FILLET8_R))
        make_face()
    fillet8_piece_31 = revolve(axis=Axis((-3.16, 2.84125, -7), (0, 1, 0)), revolution_arc=150.901220426, mode=Mode.PRIVATE)
    fillet8_piece_31 = split(fillet8_piece_31, bisect_by=Plane(origin=(-5.16, 2.84125, -7), z_dir=(1, 0, 0)), keep=Keep.TOP, mode=Mode.PRIVATE)
    add(fillet8_piece_31, mode=Mode.SUBTRACT)
    with BuildSketch(Plane(origin=(-3.16, 9.15875, 7), x_dir=(-1, 0, 0), z_dir=(0, 0, 1))) as fillet8_piece_32:
        with BuildLine():
            CenterArc((2 + FILLET8_R, -FILLET8_R), FILLET8_R, 90, 90)
            Line((2, -FILLET8_R), (2, 0))
            Line((2, 0), (2 + FILLET8_R, 0))
        make_face()
    revolve(axis=Axis((-3.16, 9.15875, 7), (0, -1, 0)), revolution_arc=90, mode=Mode.SUBTRACT)
    with BuildSketch(Plane(origin=(-3.16, 12, 7), x_dir=(-1, 0, 0), z_dir=(0, 0, 1))) as fillet8_piece_33:
        with BuildLine():
            CenterArc((2 + FILLET8_R, FILLET8_R), FILLET8_R, 180, 90)
            Line((2, FILLET8_R), (2, 0))
            Line((2, 0), (2 + FILLET8_R, 0))
        make_face()
    revolve(axis=Axis((-3.16, 12, 7), (0, -1, 0)), revolution_arc=90, mode=Mode.SUBTRACT)
    with BuildSketch(Plane(origin=(-3.16, 0, 7), x_dir=(0, 0, -1), z_dir=(1, 0, 0))) as fillet8_piece_34:
        with BuildLine():
            CenterArc((2 + FILLET8_R, FILLET8_R), FILLET8_R, 180, 90)
            Line((2, FILLET8_R), (2, 0))
            Line((2, 0), (2 + FILLET8_R, 0))
        make_face()
    revolve(axis=Axis((-3.16, 0, 7), (0, 1, 0)), revolution_arc=90, mode=Mode.SUBTRACT)
    with BuildSketch(Plane(origin=(-3.16, 2.84125, 7), x_dir=(0, 0, -1), z_dir=(1, 0, 0))) as fillet8_piece_35:
        with BuildLine():
            CenterArc((2 + FILLET8_R, -FILLET8_R), FILLET8_R, 90, 90)
            Line((2 + FILLET8_R, 0), (2, 0))
            Line((2, 0), (2, -FILLET8_R))
        make_face()
    revolve(axis=Axis((-3.16, 2.84125, 7), (0, 1, 0)), revolution_arc=90, mode=Mode.SUBTRACT)
    with BuildSketch(Plane(origin=(-12.16, 2.84125, 10.5), x_dir=(0, -1, 0), z_dir=(0, 0, -1))) as fillet8_piece_36a_section:
        with BuildLine():
            CenterArc((FILLET8_R, -FILLET8_R), FILLET8_R, 90, 90)
            Line((0, -FILLET8_R), (0, 0))
            Line((0, 0), (FILLET8_R, 0))
        make_face()
    fillet8_piece_36a = extrude(amount=6.75, mode=Mode.PRIVATE)
    fillet8_piece_36a = split(fillet8_piece_36a, bisect_by=Plane(origin=(-12.16, 2.84125, 5), z_dir=(0, 0, -1)), keep=Keep.TOP, mode=Mode.PRIVATE)
    with BuildSketch(Plane(origin=(-12.16, 1.59125, 5), x_dir=(0, 0, -1), z_dir=(0, 1, 0))) as fillet8_piece_36b_section:
        with BuildLine():
            CenterArc((FILLET8_R, -FILLET8_R), FILLET8_R, 90, 90)
            Line((0, -FILLET8_R), (0, 0))
            Line((0, 0), (FILLET8_R, 0))
        make_face()
    fillet8_piece_36b = extrude(amount=7.5675, mode=Mode.PRIVATE)
    fillet8_piece_36b = split(fillet8_piece_36b, bisect_by=Plane(origin=(-12.16, 2.84125, 5), z_dir=(0, -1, 0)), keep=Keep.TOP, mode=Mode.PRIVATE)
    fillet8_piece_36 = fillet8_piece_36a & fillet8_piece_36b
    add(fillet8_piece_36, mode=Mode.SUBTRACT)
    with BuildSketch(Plane(origin=(-12.16, 2.84125, 5), x_dir=(0, 0, -1), z_dir=(0, 1, 0))) as fillet8_piece_37a_section:
        with BuildLine():
            CenterArc((FILLET8_R, -FILLET8_R), FILLET8_R, 90, 90)
            Line((0, -FILLET8_R), (0, 0))
            Line((0, 0), (FILLET8_R, 0))
        make_face()
    fillet8_piece_37a = extrude(amount=7.5675, mode=Mode.PRIVATE)
    fillet8_piece_37a = split(fillet8_piece_37a, bisect_by=Plane(origin=(-12.16, 9.15875, 5), z_dir=(0, 1, 0)), keep=Keep.TOP, mode=Mode.PRIVATE)
    with BuildSketch(Plane(origin=(-12.16, 9.15875, 10.5), x_dir=(0, 1, 0), z_dir=(0, 0, -1))) as fillet8_piece_37b_section:
        with BuildLine():
            CenterArc((FILLET8_R, FILLET8_R), FILLET8_R, 180, 90)
            Line((0, FILLET8_R), (0, 0))
            Line((0, 0), (FILLET8_R, 0))
        make_face()
    fillet8_piece_37b = extrude(amount=6.75, mode=Mode.PRIVATE)
    fillet8_piece_37b = split(fillet8_piece_37b, bisect_by=Plane(origin=(-12.16, 9.15875, 5), z_dir=(0, 0, -1)), keep=Keep.TOP, mode=Mode.PRIVATE)
    fillet8_piece_37 = fillet8_piece_37a & fillet8_piece_37b
    add(fillet8_piece_37, mode=Mode.SUBTRACT)


solid = part.part
